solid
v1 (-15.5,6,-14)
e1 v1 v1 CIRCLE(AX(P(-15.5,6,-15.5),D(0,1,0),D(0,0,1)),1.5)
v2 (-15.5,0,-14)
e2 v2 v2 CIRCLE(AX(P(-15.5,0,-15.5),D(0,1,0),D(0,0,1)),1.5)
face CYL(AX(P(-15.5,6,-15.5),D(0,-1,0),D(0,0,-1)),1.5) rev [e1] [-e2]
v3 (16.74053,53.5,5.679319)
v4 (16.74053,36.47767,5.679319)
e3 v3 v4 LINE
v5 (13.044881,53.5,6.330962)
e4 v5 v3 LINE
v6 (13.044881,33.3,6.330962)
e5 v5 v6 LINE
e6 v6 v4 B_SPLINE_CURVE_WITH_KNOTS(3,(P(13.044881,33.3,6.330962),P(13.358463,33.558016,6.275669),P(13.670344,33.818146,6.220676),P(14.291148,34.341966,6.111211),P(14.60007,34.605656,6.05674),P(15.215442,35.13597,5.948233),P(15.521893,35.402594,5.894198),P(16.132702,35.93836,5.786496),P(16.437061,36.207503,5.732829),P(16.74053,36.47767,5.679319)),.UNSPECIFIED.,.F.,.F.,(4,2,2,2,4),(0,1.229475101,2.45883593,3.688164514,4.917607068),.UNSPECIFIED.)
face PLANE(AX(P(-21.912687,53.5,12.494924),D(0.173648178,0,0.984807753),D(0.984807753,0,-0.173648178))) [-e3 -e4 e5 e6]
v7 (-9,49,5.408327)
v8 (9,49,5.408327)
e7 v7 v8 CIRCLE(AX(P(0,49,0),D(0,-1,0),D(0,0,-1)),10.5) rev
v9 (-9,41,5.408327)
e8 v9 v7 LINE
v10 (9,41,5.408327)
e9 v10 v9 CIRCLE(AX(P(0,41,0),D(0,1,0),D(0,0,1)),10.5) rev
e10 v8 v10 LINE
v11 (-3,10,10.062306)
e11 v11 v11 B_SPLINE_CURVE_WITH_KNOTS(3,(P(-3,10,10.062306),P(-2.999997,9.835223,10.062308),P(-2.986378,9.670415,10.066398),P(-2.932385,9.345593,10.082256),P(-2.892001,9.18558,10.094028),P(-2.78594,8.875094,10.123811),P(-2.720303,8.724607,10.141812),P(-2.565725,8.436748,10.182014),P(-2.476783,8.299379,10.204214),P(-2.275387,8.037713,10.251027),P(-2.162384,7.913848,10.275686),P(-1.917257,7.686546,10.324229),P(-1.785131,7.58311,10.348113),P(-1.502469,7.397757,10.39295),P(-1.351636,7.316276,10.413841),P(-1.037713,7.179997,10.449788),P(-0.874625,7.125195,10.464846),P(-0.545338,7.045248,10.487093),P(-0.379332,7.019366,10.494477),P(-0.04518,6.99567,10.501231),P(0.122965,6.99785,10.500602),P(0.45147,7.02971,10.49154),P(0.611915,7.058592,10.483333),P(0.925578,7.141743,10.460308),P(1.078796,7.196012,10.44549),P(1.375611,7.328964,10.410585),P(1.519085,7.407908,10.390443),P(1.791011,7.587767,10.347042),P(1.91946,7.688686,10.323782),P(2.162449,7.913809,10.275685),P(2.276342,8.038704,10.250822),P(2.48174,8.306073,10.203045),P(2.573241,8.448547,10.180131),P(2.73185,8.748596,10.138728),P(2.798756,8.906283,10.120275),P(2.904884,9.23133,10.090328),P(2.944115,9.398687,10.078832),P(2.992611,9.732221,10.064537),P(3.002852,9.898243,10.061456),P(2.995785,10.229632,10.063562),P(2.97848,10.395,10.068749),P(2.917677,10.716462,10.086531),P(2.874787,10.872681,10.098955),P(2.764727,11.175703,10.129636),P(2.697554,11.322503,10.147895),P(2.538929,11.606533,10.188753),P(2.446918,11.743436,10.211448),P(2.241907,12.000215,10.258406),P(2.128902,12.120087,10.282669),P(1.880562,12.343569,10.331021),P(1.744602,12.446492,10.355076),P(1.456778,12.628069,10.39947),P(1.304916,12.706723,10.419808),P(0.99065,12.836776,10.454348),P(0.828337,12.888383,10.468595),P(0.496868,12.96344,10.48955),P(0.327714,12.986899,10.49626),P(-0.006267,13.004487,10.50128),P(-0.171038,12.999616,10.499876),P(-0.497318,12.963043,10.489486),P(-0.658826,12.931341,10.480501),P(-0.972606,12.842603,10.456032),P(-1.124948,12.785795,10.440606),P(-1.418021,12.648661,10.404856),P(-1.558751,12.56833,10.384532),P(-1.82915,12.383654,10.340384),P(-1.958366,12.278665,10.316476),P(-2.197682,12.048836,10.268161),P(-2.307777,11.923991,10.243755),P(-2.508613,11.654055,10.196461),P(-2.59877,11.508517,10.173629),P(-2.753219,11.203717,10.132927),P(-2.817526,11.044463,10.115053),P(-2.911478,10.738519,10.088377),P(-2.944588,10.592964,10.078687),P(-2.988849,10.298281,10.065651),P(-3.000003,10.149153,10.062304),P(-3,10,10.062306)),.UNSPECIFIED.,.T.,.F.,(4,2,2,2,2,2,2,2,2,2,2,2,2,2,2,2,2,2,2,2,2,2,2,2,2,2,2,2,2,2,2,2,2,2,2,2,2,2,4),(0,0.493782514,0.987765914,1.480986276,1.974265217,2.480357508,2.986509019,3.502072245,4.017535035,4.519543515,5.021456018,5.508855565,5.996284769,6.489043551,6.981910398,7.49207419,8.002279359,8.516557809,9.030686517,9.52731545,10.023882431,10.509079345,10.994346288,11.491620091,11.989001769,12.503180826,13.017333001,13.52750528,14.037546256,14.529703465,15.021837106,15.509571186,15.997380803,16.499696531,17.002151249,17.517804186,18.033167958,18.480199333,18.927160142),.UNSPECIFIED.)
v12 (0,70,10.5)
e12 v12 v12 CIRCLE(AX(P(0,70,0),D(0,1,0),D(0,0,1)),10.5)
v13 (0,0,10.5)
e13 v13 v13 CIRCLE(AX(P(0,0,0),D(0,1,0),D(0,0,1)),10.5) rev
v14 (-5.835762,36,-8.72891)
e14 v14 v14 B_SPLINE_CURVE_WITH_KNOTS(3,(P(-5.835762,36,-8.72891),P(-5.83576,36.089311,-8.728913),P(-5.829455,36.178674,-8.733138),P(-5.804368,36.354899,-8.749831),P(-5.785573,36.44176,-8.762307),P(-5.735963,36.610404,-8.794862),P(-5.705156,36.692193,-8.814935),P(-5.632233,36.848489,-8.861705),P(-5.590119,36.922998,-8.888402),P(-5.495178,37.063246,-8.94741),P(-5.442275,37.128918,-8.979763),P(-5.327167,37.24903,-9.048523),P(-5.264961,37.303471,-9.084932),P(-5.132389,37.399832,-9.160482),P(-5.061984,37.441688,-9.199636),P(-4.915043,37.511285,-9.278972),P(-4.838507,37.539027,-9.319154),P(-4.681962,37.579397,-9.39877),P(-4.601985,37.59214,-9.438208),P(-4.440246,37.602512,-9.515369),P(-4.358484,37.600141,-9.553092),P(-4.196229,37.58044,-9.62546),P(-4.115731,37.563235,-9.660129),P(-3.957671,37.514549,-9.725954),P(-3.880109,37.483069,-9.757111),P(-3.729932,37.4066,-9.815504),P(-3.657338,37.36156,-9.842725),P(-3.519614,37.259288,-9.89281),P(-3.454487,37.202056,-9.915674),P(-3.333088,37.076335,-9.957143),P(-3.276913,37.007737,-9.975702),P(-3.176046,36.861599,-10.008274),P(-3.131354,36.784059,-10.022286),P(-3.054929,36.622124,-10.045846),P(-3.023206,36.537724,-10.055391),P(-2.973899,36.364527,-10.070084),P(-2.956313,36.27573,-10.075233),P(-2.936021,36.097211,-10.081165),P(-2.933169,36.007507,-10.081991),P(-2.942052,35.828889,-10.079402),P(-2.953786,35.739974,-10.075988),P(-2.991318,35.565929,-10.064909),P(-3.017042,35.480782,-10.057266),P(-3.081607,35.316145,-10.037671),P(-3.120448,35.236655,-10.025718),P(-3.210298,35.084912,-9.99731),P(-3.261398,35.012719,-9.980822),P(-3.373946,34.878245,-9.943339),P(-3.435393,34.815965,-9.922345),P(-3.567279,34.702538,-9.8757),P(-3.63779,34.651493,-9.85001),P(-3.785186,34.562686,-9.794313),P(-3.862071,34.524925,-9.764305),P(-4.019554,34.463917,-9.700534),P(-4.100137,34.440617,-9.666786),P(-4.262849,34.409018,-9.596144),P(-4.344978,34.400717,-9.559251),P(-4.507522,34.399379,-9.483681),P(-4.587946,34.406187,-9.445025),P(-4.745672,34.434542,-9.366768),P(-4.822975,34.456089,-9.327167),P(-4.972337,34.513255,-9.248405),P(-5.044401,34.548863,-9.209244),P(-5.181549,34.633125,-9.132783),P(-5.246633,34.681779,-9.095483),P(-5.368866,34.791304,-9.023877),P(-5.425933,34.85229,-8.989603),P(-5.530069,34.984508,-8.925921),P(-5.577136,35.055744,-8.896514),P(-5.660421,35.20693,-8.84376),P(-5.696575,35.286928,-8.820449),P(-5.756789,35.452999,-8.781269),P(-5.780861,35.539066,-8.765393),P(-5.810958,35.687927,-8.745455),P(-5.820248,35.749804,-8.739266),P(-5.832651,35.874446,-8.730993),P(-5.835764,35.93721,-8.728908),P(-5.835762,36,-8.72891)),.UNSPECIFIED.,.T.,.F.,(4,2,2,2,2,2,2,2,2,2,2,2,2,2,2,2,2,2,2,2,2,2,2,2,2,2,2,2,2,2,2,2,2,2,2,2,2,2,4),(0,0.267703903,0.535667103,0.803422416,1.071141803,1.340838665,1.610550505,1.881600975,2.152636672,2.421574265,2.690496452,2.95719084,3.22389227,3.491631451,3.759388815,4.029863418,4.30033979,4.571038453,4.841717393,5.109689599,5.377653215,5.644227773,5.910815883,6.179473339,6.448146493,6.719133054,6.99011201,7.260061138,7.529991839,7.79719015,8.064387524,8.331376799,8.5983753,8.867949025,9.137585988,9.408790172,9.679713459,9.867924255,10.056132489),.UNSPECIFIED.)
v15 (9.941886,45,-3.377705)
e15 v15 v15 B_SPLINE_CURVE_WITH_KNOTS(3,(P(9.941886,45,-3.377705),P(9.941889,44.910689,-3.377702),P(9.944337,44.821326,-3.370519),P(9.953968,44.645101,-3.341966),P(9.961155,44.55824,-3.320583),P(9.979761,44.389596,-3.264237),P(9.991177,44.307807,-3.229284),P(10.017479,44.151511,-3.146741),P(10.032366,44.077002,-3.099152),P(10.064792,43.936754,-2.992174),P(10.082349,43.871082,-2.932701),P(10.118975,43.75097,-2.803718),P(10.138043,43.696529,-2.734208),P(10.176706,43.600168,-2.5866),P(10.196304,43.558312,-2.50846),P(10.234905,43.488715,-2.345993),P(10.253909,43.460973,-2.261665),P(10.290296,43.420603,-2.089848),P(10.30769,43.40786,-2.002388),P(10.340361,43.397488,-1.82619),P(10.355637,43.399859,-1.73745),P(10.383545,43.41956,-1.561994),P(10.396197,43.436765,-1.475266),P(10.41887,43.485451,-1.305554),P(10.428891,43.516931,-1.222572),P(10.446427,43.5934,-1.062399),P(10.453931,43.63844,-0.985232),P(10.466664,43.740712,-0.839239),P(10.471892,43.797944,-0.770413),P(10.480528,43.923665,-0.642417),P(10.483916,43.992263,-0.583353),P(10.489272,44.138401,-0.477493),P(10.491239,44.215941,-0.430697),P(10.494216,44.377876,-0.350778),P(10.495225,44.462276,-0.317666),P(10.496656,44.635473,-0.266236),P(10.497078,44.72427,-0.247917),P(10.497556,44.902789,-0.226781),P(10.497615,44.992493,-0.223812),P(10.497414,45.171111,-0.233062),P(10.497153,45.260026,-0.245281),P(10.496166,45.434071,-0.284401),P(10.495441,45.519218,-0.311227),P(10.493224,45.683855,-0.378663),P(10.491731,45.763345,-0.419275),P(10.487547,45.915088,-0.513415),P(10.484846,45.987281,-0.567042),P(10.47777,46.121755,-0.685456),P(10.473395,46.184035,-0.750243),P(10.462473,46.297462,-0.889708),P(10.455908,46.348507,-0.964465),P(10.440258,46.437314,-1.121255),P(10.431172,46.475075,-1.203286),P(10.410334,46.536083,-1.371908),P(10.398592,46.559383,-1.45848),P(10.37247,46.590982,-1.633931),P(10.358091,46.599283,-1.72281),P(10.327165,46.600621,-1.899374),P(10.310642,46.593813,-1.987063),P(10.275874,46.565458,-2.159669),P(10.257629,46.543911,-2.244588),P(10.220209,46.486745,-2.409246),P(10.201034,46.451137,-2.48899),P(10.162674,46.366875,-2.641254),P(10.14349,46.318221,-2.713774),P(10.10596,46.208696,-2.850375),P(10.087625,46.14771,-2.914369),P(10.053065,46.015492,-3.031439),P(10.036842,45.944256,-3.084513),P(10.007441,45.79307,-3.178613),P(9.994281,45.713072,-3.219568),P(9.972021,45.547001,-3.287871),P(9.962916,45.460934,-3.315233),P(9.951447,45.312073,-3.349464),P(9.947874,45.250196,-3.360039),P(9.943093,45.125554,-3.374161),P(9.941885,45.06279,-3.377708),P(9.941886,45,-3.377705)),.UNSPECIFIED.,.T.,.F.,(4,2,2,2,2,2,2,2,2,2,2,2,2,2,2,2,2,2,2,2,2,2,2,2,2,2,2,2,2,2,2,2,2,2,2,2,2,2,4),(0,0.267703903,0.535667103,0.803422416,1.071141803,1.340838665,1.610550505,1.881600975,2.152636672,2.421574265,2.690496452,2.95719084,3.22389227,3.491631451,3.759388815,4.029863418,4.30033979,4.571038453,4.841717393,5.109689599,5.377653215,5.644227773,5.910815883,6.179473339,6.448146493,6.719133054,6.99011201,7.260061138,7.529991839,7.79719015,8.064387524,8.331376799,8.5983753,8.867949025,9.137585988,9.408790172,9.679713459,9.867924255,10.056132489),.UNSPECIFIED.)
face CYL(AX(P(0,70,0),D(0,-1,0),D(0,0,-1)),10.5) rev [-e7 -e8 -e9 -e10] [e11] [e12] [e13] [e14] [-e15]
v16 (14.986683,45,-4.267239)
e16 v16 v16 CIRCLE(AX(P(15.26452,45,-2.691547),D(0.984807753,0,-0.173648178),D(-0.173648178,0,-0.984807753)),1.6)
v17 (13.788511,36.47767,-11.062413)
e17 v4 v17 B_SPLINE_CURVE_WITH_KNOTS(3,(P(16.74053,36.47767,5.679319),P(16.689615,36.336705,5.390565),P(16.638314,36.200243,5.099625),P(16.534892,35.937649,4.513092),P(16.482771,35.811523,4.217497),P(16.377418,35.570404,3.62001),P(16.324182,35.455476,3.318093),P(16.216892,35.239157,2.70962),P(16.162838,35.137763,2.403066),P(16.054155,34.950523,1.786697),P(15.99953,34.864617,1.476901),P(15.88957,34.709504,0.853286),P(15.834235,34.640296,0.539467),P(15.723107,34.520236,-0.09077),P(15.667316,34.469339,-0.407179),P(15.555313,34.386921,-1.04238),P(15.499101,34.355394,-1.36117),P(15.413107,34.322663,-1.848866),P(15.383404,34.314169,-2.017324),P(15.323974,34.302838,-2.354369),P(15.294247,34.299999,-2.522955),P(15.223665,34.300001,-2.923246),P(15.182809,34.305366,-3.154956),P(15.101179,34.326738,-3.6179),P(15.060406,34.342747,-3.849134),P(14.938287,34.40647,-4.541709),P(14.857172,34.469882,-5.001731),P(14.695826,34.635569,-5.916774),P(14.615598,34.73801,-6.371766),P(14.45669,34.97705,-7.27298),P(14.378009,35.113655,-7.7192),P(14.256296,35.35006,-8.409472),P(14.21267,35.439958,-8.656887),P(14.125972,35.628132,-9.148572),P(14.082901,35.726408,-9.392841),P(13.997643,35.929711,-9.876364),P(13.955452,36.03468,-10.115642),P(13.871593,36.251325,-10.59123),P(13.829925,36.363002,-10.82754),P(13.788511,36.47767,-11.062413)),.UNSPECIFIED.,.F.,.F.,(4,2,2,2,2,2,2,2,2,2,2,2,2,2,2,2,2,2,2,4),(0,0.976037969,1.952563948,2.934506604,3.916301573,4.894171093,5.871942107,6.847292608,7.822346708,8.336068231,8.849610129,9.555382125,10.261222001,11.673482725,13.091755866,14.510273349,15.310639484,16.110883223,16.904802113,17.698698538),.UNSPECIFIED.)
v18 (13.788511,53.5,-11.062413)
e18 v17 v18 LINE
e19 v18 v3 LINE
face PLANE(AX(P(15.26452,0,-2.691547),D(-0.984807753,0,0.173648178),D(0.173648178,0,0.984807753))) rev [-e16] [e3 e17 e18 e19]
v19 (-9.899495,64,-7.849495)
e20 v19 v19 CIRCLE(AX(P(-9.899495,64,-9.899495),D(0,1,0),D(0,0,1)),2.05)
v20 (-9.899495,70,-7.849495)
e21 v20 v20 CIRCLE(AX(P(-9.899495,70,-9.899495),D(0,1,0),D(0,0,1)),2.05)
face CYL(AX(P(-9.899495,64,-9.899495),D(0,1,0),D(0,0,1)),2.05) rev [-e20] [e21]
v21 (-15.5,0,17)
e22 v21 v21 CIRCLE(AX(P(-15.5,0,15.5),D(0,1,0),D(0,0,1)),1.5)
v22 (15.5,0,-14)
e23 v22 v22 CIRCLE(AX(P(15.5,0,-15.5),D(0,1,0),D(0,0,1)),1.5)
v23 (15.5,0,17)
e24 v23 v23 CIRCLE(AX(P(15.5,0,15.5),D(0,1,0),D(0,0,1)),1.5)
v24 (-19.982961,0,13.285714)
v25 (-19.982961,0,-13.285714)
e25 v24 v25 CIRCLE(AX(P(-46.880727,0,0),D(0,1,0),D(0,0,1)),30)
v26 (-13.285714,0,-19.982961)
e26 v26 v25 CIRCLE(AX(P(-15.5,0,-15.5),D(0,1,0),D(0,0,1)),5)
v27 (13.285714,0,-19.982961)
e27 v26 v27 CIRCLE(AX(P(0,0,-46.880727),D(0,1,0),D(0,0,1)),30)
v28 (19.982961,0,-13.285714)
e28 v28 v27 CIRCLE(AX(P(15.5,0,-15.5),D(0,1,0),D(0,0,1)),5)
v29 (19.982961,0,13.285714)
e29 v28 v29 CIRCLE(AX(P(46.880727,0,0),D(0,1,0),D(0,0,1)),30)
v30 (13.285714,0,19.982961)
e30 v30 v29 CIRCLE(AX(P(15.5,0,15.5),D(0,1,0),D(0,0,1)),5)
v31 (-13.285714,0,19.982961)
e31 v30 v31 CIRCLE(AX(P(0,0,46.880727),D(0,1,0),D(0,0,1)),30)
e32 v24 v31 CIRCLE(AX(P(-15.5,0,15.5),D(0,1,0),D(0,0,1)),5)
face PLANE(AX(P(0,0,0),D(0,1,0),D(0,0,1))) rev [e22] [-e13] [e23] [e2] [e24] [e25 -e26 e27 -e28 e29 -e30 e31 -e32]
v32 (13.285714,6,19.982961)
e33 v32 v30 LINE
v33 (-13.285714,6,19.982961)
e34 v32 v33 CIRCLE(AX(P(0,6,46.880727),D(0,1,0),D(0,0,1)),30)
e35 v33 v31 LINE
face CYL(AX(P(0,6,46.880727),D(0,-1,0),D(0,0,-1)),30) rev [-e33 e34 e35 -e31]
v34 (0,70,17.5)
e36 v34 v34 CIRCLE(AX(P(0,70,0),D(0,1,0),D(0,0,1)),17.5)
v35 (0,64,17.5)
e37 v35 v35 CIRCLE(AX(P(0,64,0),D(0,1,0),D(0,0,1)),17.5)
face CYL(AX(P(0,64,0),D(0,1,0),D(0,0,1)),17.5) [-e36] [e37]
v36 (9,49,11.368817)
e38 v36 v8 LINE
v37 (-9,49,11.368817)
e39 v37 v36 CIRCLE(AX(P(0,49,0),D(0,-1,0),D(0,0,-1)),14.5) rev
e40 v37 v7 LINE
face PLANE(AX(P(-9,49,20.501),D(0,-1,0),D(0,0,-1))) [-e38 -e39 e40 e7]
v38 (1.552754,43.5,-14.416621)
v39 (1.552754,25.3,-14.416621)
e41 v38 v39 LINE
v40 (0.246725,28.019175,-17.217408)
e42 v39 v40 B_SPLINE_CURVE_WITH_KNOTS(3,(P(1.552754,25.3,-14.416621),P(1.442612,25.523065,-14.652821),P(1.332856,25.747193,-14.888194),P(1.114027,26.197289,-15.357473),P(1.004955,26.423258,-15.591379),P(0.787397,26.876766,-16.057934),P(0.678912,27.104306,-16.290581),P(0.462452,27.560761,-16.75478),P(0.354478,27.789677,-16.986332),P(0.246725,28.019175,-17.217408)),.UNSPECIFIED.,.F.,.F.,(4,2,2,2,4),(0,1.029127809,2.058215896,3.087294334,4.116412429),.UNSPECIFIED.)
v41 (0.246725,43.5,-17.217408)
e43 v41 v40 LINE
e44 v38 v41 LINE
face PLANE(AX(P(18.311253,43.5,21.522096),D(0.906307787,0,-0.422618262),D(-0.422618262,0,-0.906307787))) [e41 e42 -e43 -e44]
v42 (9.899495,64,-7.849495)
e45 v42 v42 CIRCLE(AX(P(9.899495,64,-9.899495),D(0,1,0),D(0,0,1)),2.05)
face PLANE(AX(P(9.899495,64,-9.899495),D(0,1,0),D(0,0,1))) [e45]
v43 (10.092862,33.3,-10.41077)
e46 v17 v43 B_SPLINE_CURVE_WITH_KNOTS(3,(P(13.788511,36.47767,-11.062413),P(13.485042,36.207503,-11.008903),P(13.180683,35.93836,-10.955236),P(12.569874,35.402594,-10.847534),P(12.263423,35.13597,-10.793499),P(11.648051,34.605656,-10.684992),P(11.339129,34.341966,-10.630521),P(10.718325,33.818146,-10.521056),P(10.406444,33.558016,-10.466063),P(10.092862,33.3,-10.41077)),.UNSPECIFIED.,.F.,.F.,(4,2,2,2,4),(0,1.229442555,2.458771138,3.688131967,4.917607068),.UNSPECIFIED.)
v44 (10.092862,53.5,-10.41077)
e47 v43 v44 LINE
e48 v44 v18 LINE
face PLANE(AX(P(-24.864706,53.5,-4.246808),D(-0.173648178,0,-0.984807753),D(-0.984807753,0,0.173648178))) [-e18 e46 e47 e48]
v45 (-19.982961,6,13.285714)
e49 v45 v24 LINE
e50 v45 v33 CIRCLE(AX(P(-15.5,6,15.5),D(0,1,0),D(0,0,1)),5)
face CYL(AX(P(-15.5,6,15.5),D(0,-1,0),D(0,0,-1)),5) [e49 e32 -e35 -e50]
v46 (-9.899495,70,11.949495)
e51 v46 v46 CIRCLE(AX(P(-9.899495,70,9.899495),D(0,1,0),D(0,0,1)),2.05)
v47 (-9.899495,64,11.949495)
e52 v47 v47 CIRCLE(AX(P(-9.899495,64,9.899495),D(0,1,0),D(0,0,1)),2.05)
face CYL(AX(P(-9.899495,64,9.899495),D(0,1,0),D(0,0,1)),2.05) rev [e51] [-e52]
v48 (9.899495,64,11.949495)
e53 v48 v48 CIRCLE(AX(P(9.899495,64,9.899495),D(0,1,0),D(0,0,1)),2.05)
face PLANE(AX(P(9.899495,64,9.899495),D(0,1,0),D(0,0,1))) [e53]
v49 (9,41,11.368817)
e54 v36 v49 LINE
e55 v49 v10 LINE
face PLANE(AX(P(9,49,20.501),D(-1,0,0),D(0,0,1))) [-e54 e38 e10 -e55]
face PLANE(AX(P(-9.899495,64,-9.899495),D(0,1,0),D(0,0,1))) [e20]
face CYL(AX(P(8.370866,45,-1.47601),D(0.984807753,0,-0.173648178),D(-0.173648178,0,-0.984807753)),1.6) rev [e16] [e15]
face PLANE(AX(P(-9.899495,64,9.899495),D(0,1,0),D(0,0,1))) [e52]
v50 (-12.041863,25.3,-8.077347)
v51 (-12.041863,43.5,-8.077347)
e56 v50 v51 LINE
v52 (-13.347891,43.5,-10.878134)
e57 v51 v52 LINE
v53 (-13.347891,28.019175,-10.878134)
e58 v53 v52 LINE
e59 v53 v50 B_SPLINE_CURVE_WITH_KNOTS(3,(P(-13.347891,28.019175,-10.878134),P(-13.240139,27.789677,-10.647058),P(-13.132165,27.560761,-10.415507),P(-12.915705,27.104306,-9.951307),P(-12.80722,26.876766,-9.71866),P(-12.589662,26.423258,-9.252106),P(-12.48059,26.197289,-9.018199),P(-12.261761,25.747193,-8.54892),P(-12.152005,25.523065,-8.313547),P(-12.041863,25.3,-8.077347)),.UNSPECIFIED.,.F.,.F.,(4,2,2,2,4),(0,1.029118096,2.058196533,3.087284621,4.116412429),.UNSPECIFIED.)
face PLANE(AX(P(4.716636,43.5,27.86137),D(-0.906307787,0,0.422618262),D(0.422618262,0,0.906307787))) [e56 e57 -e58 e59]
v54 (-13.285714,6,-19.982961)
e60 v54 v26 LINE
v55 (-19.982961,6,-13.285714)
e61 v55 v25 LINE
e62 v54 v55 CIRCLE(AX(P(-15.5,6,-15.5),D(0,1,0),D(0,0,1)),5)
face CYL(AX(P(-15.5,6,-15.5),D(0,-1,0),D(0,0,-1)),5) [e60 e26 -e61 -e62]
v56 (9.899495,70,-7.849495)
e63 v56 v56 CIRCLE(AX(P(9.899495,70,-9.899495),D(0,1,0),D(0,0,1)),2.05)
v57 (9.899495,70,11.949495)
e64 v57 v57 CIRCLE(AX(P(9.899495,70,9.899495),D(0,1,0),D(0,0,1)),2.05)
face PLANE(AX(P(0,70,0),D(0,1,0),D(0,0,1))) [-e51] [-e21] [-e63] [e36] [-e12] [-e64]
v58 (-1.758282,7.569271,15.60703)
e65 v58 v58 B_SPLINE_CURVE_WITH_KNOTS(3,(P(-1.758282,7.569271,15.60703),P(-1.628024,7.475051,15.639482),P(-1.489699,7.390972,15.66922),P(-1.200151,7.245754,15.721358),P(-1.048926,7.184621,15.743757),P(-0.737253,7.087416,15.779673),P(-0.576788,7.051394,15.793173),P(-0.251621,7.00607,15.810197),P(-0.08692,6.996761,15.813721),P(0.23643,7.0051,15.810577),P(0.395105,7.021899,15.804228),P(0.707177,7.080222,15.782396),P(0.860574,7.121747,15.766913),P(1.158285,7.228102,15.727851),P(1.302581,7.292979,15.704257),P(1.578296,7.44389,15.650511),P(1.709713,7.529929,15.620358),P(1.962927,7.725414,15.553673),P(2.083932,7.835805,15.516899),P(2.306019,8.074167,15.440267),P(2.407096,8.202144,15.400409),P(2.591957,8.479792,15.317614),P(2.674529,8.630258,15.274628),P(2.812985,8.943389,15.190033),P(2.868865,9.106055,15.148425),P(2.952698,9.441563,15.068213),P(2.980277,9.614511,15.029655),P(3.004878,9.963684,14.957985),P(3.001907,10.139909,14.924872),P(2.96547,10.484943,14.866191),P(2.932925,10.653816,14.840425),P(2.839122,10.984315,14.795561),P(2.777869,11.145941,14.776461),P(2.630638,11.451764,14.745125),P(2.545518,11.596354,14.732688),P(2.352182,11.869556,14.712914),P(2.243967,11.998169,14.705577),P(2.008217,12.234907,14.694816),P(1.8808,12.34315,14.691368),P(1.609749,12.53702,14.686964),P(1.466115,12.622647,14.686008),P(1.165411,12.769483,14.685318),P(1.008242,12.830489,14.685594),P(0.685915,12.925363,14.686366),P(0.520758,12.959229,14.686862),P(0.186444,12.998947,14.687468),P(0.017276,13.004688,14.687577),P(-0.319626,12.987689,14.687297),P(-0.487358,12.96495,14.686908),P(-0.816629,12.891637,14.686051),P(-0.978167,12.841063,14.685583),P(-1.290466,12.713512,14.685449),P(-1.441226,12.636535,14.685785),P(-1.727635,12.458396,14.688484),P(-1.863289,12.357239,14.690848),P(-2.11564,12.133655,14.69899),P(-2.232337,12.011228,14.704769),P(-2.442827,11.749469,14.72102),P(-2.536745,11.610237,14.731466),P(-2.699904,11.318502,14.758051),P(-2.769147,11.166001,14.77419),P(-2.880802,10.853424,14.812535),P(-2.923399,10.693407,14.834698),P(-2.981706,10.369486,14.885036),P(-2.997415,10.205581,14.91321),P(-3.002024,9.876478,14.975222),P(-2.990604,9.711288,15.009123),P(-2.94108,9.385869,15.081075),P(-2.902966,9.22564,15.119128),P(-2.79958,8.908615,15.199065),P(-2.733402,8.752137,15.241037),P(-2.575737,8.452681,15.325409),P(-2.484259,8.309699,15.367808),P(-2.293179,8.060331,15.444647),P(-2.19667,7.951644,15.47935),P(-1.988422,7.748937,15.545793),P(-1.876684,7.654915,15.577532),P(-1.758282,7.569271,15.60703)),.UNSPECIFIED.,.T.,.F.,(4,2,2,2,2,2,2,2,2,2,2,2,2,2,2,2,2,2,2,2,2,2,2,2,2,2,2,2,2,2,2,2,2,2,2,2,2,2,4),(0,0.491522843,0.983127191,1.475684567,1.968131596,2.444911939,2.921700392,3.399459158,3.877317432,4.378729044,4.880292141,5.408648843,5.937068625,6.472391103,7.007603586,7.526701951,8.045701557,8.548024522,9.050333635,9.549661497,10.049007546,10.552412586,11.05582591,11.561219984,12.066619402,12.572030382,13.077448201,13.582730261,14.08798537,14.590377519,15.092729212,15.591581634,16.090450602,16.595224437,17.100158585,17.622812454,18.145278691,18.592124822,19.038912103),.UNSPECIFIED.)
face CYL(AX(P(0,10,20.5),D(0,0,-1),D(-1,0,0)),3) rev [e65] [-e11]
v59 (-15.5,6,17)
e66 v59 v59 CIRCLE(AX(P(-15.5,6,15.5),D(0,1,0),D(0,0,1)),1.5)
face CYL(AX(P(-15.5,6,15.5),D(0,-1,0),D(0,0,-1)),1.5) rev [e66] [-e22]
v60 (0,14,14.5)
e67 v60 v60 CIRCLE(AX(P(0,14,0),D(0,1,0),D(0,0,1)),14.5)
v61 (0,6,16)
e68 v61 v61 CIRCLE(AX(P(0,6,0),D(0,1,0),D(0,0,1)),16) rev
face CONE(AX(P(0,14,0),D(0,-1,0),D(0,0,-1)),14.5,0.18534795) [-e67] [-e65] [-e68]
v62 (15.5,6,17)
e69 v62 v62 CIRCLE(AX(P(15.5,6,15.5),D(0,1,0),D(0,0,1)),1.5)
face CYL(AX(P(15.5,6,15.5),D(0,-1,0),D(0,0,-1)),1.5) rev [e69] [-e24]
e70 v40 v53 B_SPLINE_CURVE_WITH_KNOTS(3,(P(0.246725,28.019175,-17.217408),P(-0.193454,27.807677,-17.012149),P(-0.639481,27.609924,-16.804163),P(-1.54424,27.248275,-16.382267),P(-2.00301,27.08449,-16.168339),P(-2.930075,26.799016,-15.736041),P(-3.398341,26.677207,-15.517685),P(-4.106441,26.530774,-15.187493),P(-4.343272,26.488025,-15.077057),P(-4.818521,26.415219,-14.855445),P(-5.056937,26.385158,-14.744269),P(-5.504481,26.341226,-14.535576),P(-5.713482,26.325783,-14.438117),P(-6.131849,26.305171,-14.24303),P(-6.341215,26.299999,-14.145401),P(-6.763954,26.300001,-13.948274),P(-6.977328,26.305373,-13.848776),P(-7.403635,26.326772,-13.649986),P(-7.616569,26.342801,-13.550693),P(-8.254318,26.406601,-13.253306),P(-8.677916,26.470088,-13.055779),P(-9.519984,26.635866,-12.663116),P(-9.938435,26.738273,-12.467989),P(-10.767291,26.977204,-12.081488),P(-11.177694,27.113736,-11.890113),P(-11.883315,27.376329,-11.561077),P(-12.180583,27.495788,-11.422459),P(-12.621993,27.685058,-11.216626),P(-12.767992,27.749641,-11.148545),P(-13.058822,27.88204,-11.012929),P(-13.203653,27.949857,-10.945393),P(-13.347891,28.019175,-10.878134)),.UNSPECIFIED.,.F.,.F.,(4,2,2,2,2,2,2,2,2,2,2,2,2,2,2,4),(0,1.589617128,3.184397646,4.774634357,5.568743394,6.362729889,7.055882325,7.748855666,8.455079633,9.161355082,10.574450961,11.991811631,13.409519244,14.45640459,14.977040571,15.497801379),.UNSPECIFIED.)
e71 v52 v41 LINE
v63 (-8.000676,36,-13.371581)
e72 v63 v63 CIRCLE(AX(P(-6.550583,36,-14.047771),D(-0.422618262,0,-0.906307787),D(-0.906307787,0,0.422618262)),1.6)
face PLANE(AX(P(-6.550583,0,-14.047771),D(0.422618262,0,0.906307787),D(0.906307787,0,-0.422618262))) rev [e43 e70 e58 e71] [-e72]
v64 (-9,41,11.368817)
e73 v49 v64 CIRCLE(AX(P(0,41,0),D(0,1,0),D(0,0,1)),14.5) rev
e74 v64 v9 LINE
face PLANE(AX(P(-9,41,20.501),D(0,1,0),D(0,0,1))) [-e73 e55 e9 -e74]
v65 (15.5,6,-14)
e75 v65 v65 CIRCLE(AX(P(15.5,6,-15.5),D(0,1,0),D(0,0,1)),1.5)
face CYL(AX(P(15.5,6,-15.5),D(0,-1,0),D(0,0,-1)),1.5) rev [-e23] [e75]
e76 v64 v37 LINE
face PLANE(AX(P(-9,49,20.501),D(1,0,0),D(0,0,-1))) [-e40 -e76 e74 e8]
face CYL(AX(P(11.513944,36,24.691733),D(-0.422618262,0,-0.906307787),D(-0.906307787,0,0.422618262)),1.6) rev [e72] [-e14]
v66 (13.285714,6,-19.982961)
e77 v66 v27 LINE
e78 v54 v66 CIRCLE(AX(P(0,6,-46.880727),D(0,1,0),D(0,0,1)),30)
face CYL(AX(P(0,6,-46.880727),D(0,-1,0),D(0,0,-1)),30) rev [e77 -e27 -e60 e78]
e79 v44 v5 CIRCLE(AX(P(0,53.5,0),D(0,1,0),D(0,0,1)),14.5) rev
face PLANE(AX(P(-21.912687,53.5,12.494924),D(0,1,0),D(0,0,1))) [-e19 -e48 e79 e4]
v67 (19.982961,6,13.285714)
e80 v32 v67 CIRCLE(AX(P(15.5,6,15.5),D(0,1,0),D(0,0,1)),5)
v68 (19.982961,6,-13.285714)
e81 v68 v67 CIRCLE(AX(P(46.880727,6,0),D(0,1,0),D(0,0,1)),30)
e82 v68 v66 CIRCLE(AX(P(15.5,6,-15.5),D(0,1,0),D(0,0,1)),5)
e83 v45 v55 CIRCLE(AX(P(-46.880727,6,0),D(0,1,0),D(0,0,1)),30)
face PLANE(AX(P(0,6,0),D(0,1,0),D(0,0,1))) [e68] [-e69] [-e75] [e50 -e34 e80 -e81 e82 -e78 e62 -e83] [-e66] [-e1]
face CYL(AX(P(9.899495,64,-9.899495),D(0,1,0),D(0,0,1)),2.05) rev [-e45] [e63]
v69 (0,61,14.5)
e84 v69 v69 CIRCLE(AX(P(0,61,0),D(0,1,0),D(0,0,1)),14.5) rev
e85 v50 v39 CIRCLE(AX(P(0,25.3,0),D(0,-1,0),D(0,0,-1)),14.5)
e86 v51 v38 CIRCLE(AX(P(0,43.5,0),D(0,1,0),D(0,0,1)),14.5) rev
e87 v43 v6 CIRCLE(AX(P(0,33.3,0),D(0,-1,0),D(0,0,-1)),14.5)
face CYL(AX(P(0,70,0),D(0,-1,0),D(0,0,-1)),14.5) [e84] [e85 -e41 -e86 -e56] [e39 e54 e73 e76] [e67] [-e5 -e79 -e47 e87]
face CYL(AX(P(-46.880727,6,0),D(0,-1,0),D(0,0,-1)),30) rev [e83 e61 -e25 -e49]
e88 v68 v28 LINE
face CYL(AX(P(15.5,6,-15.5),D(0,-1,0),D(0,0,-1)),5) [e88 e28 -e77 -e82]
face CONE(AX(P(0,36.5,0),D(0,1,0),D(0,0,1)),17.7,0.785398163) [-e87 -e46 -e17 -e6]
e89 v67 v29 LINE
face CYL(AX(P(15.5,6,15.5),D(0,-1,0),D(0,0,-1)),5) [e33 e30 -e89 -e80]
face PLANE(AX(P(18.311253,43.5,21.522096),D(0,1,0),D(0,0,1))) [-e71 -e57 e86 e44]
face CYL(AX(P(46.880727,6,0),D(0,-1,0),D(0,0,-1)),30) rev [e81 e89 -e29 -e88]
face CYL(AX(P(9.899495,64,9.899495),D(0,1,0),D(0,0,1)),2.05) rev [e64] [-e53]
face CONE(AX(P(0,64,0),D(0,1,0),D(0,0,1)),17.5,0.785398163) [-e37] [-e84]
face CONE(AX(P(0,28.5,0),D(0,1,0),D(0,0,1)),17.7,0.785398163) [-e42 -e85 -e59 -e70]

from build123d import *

# Parameters (mm, degrees)
SKETCH1_R                = 1.5
BOSS_EXTRUDE1_DEPTH      = 6
SKETCH3_R                = 14.5
SKETCH3_R_2              = 10.5
BOSS_EXTRUDE2_DEPTH      = 64
CHAMFER1_SIZE            = 1.5
CHAMFER1_SIZE2           = 8
BOSS_EXTRUDE3_START      = -6
SKETCH4_R                = 17.5
SKETCH4_R_2              = 14.5
BOSS_EXTRUDE3_DEPTH      = 6
CHAMFER2_SIZE            = 3
SKETCH5_R                = 2.05
CUT_EXTRUDE1_DEPTH       = 6
SKETCH6_R                = 1.6
CUT_EXTRUDE2_DEPTH       = 6
BOSS_EXTRUDE5_REACH      = 83.957
BOSS_EXTRUDE5_END_RADIUS = 14.5
SKETCH8_W                = 17
SKETCH8_H                = 17
SKETCH8_R                = 1.6
CHAMFER3_SIZE            = 3.2
CUT_EXTRUDE3_REACH       = 84.102
CUT_EXTRUDE3_END_RADIUS  = 10.5
SKETCH9_R                = 1.6
BOSS_EXTRUDE6_REACH      = 84.615
BOSS_EXTRUDE6_END_RADIUS = 14.5
SKETCH10_W               = 15
SKETCH10_H               = 15
SKETCH10_R               = 1.6
CHAMFER4_SIZE            = 3.2
CUT_EXTRUDE4_REACH       = 72.26
SKETCH12_R               = 10.5
CUT_EXTRUDE5_REACH       = 77.766
CUT_EXTRUDE5_END_RADIUS  = 14.5
SKETCH13_W               = 18
SKETCH13_H               = 8
SKETCH14_R               = 3
CUT_EXTRUDE6_DEPTH       = 76.766087493


# Some blends are built 0.0001 mm under size
with BuildPart() as part:
    # Sketch1 → Boss-Extrude1 (new body)
    with BuildSketch(Plane(origin=(0, 0, 0), x_dir=(1, 0, 0), z_dir=(0, 1, 0))):
        with BuildLine():
            ThreePointArc((13.285714286, 19.982960938), (0, 16.880726569), (-13.285714286, 19.982960938))
            ThreePointArc((-13.285714286, 19.982960938), (-19.035533906, 19.035533906), (-19.982960938, 13.285714286))
            ThreePointArc((-19.982960938, 13.285714286), (-16.880726569, 0), (-19.982960938, -13.285714286))
            ThreePointArc((-19.982960938, -13.285714286), (-19.035533906, -19.035533906), (-13.285714286, -19.982960938))
            ThreePointArc((-13.285714286, -19.982960938), (0, -16.880726569), (13.285714286, -19.982960938))
            ThreePointArc((13.285714286, -19.982960938), (19.035533906, -19.035533906), (19.982960938, -13.285714286))
            ThreePointArc((19.982960938, -13.285714286), (16.880726569, 0), (19.982960938, 13.285714286))
            ThreePointArc((19.982960938, 13.285714286), (19.035533906, 19.035533906), (13.285714286, 19.982960938))
        make_face()
        with Locations(Location((-15.5, -15.5, 0), (0, 0, 270))):
            Circle(SKETCH1_R, mode=Mode.SUBTRACT)
        with Locations(Location((15.5, -15.5, 0), (0, 0, 270))):
            Circle(SKETCH1_R, mode=Mode.SUBTRACT)
        with Locations(Location((-15.5, 15.5, 0), (0, 0, 270))):
            Circle(SKETCH1_R, mode=Mode.SUBTRACT)
        with Locations(Location((15.5, 15.5, 0), (0, 0, 270))):
            Circle(SKETCH1_R, mode=Mode.SUBTRACT)
    extrude(amount=BOSS_EXTRUDE1_DEPTH)

    # Sketch3 → Boss-Extrude2 (add)
    with BuildSketch(Plane(origin=(0, 6, 0), x_dir=(1, 0, 0), z_dir=(0, 1, 0))):
        with Locations(Location((0, 0, 0), (0, 0, 270))):
            Circle(SKETCH3_R)
        with Locations(Location((0, 0, 0), (0, 0, 270))):
            Circle(SKETCH3_R_2, mode=Mode.SUBTRACT)
    extrude(amount=BOSS_EXTRUDE2_DEPTH)

    # Chamfer1
    chamfer1_edges = [part.edges().sort_by_distance(p)[0] for p in [
        (0, 6, -14.5),
    ]]
    chamfer1_side = [part.faces().sort_by_distance(p)[0] for p in [
        (18.625533906, 6, -18.625533906),
    ]]
    chamfer(chamfer1_edges, length=CHAMFER1_SIZE, length2=CHAMFER1_SIZE2, reference=chamfer1_side[0])

    # Sketch4 → Boss-Extrude3 (add)
    with BuildSketch(Plane(origin=(0, 70, 0), x_dir=(1, 0, 0), z_dir=(0, 1, 0)).offset(BOSS_EXTRUDE3_START)):
        with Locations(Location((0, 0, 0), (0, 0, 270))):
            Circle(SKETCH4_R)
        with Locations(Location((0, 0, 0), (0, 0, 270))):
            Circle(SKETCH4_R_2, mode=Mode.SUBTRACT)
    extrude(amount=BOSS_EXTRUDE3_DEPTH)

    # Chamfer2
    chamfer2_edges = [part.edges().sort_by_distance(p)[0] for p in [
        (0, 64, -14.5),
    ]]
    chamfer(chamfer2_edges, length=CHAMFER2_SIZE - 0.0001)  # a hair under: the kernel refuses the full size

    # Sketch5 → Cut-Extrude1 (cut)
    with BuildSketch(Plane(origin=(0, 70, 0), x_dir=(1, 0, 0), z_dir=(0, 1, 0))):
        with Locations(Location((-9.899494937, 9.899494937, 0), (0, 0, 270))):
            Circle(SKETCH5_R)
        with Locations(Location((9.899494937, 9.899494937, 0), (0, 0, 270))):
            Circle(SKETCH5_R)
        with Locations(Location((9.899494937, -9.899494937, 0), (0, 0, 270))):
            Circle(SKETCH5_R)
        with Locations(Location((-9.899494937, -9.899494937, 0), (0, 0, 270))):
            Circle(SKETCH5_R)
    extrude(amount=-CUT_EXTRUDE1_DEPTH, mode=Mode.SUBTRACT)

    # Sketch6 → Cut-Extrude2 (cut)
    with BuildSketch(Plane(origin=(14.279712419, 0, -2.517898576), x_dir=(0, -1, 0), z_dir=(0.9848077530122086, 0, -0.17364817766692736))):
        with Locations(Location((-45, 0, 0), (0, 0, 90))):
            Circle(SKETCH6_R)
    extrude(amount=-CUT_EXTRUDE2_DEPTH, mode=Mode.SUBTRACT)

    # Boss-Extrude5: up to this cylinder (the profile starts outside it)
    boss_extrude5_end = Plane(origin=(0, 45, 0), z_dir=(0, -1, 0)) * Cylinder(BOSS_EXTRUDE5_END_RADIUS, 197.914, mode=Mode.PRIVATE)
    # Sketch8 → Boss-Extrude5 (add, up to the surface)
    with BuildSketch(Plane(origin=(15.264520172, 0, -2.691546754), x_dir=(0, -1, 0), z_dir=(0.9848077530122086, 0, -0.17364817766692736)), mode=Mode.PRIVATE) as boss_extrude5_sk1:
        with Locations((-45, 0)):
            Rectangle(SKETCH8_W, SKETCH8_H)
        with Locations(Location((-45, 0, 0), (0, 0, 90))):
            Circle(SKETCH8_R, mode=Mode.SUBTRACT)
    boss_extrude5_tool1 = extrude(boss_extrude5_sk1.sketch, amount=-BOSS_EXTRUDE5_REACH, mode=Mode.PRIVATE) - boss_extrude5_end
    add(boss_extrude5_tool1.solids().sort_by_distance((16.698782, 45, 5.442555))[0])

    # Chamfer3
    # the kernel refuses this chamfer: 3.2 mm, written as the material it adds along each edge
    with BuildSketch(Plane(origin=(0, 36.5, 0), x_dir=(0.20083050199504038, 0, -0.9796260048959603), z_dir=(-0.9796260048959603, 0, -0.20083050199504038))) as chamfer3_piece_1_section:
        Polygon((14.5, CHAMFER3_SIZE), (14.5 + CHAMFER3_SIZE, 0), (14.5, 0), align=None)
    chamfer3_piece_1 = revolve(axis=Axis((0, 36.5, 0), (0, -1, 0)), revolution_arc=136.828942556, mode=Mode.PRIVATE)
    chamfer3_piece_1 = split(chamfer3_piece_1, bisect_by=Plane(origin=(11.940348366, 33.784233454, -10.736531777), z_dir=(0.1736481776669274, 0, 0.9848077530122087)), keep=Keep.TOP, mode=Mode.PRIVATE)
    chamfer3_piece_1 = split(chamfer3_piece_1, bisect_by=Plane(origin=(14.892367386, 33.784233454, 6.005200024), z_dir=(-0.1736481776669274, 0, -0.9848077530122087)), keep=Keep.TOP, mode=Mode.PRIVATE)
    chamfer3_piece_1 = split(chamfer3_piece_1, bisect_by=Plane(origin=(14.206335343, 33.784233454, -8.692811132), z_dir=(-0.9848077530122086, 0, 0.17364817766692736)), keep=Keep.TOP, mode=Mode.PRIVATE)
    add(chamfer3_piece_1)

    # Cut-Extrude3: up to this cylinder (the profile starts outside it)
    cut_extrude3_end = Plane(origin=(0, 36, 0), z_dir=(0, -1, 0)) * Cylinder(CUT_EXTRUDE3_END_RADIUS, 190.204, mode=Mode.PRIVATE)
    # Sketch9 → Cut-Extrude3 (cut, up to the surface)
    with BuildSketch(Plane(origin=(-6.127964795, 0, -13.141462912), x_dir=(0, -1, 0), z_dir=(-0.4226182617407003, 0, -0.9063077870366496)), mode=Mode.PRIVATE) as cut_extrude3_sk1:
        with Locations(Location((-36, 0, 0), (0, 0, 90))):
            Circle(SKETCH9_R)
    cut_extrude3_tool1 = extrude(cut_extrude3_sk1.sketch, amount=-CUT_EXTRUDE3_REACH, mode=Mode.PRIVATE) - cut_extrude3_end
    add(cut_extrude3_tool1.solids().sort_by_distance((-6.127965, 36, -13.141463))[0], mode=Mode.SUBTRACT)

    # Boss-Extrude6: up to this cylinder (the profile starts outside it)
    boss_extrude6_end = Plane(origin=(0, 36, 0), z_dir=(0, -1, 0)) * Cylinder(BOSS_EXTRUDE6_END_RADIUS, 199.23, mode=Mode.PRIVATE)
    # Sketch10 → Boss-Extrude6 (add, up to the surface)
    with BuildSketch(Plane(origin=(-6.550583057, 0, -14.047770699), x_dir=(0, -1, 0), z_dir=(-0.4226182617407003, 0, -0.9063077870366496)), mode=Mode.PRIVATE) as boss_extrude6_sk1:
        with Locations((-36, 0)):
            Rectangle(SKETCH10_W, SKETCH10_H)
        with Locations(Location((-36, 0, 0), (0, 0, 90))):
            Circle(SKETCH10_R, mode=Mode.SUBTRACT)
    boss_extrude6_tool1 = extrude(boss_extrude6_sk1.sketch, amount=-BOSS_EXTRUDE6_REACH, mode=Mode.PRIVATE) - boss_extrude6_end
    add(boss_extrude6_tool1.solids().sort_by_distance((0.054468, 36, -17.127757))[0])

    # Chamfer4
    # the kernel refuses this chamfer: 3.2 mm, written as the material it adds along each edge
    with BuildSketch(Plane(origin=(0, 28.5, 0), x_dir=(0.6248545618954165, -1.4700884188140002e-15, -0.7807411712459431), z_dir=(0.7807411712459431, -1.7863424461528943e-15, 0.6248545618954165))) as chamfer4_piece_1_section:
        Polygon((14.5, -CHAMFER4_SIZE), (14.5 + CHAMFER4_SIZE, 0), (14.5, 0), align=None)
    chamfer4_piece_1 = revolve(axis=Axis((0, 28.5, 0), (0, 1, 0)), revolution_arc=127.343026959, mode=Mode.PRIVATE)
    chamfer4_piece_1 = split(chamfer4_piece_1, bisect_by=Plane(origin=(-12.659682405, 25.706017634, -9.402264656), z_dir=(0.9063077870366496, 0, -0.42261826174070033)), keep=Keep.TOP, mode=Mode.PRIVATE)
    chamfer4_piece_1 = split(chamfer4_piece_1, bisect_by=Plane(origin=(0.9349344, 25.706017634, -15.741538582), z_dir=(-0.9063077870366496, 0, 0.42261826174070033)), keep=Keep.TOP, mode=Mode.PRIVATE)
    chamfer4_piece_1 = split(chamfer4_piece_1, bisect_by=Plane(origin=(-1.74730187, 25.706017634, -16.287577501), z_dir=(0.4226182617407003, 0, 0.9063077870366496)), keep=Keep.TOP, mode=Mode.PRIVATE)
    add(chamfer4_piece_1)

    # Sketch12 → Cut-Extrude4 (cut, up to next)
    with BuildSketch(Plane(origin=(0, 6, 0), x_dir=(1, 0, 0), z_dir=(0, 1, 0)), mode=Mode.PRIVATE) as cut_extrude4_sk1:
        with Locations(Location((0, 0, 0), (0, 0, 270))):
            Circle(SKETCH12_R)
    cut_extrude4_tool1 = extrude(cut_extrude4_sk1.sketch, amount=-CUT_EXTRUDE4_REACH, mode=Mode.PRIVATE) & part.part
    add(cut_extrude4_tool1.solids().sort_by_distance((0, 6, 0))[0], mode=Mode.SUBTRACT)

    # Cut-Extrude5: up to this cylinder (the profile starts inside it)
    cut_extrude5_end = Plane(origin=(0, 45, 0), z_dir=(0, -1, 0)) * Cylinder(CUT_EXTRUDE5_END_RADIUS, 185.532, mode=Mode.PRIVATE)
    # Sketch13 → Cut-Extrude5 (cut, up to the surface)
    with BuildSketch(Plane.XY, mode=Mode.PRIVATE) as cut_extrude5_sk1:
        with Locations((0, 45)):
            Rectangle(SKETCH13_W, SKETCH13_H)
    cut_extrude5_tool1 = extrude(cut_extrude5_sk1.sketch, amount=CUT_EXTRUDE5_REACH, mode=Mode.PRIVATE) & cut_extrude5_end
    add(cut_extrude5_tool1.solids().sort_by_distance((0, 45, 0))[0], mode=Mode.SUBTRACT)

    # Sketch14 → Cut-Extrude6 (cut, through all)
    with BuildSketch(Plane.XY):
        with Locations(Location((0, 10, 0), (0, 0, 180))):
            Circle(SKETCH14_R)
    extrude(amount=CUT_EXTRUDE6_DEPTH, mode=Mode.SUBTRACT)


solid = part.part
